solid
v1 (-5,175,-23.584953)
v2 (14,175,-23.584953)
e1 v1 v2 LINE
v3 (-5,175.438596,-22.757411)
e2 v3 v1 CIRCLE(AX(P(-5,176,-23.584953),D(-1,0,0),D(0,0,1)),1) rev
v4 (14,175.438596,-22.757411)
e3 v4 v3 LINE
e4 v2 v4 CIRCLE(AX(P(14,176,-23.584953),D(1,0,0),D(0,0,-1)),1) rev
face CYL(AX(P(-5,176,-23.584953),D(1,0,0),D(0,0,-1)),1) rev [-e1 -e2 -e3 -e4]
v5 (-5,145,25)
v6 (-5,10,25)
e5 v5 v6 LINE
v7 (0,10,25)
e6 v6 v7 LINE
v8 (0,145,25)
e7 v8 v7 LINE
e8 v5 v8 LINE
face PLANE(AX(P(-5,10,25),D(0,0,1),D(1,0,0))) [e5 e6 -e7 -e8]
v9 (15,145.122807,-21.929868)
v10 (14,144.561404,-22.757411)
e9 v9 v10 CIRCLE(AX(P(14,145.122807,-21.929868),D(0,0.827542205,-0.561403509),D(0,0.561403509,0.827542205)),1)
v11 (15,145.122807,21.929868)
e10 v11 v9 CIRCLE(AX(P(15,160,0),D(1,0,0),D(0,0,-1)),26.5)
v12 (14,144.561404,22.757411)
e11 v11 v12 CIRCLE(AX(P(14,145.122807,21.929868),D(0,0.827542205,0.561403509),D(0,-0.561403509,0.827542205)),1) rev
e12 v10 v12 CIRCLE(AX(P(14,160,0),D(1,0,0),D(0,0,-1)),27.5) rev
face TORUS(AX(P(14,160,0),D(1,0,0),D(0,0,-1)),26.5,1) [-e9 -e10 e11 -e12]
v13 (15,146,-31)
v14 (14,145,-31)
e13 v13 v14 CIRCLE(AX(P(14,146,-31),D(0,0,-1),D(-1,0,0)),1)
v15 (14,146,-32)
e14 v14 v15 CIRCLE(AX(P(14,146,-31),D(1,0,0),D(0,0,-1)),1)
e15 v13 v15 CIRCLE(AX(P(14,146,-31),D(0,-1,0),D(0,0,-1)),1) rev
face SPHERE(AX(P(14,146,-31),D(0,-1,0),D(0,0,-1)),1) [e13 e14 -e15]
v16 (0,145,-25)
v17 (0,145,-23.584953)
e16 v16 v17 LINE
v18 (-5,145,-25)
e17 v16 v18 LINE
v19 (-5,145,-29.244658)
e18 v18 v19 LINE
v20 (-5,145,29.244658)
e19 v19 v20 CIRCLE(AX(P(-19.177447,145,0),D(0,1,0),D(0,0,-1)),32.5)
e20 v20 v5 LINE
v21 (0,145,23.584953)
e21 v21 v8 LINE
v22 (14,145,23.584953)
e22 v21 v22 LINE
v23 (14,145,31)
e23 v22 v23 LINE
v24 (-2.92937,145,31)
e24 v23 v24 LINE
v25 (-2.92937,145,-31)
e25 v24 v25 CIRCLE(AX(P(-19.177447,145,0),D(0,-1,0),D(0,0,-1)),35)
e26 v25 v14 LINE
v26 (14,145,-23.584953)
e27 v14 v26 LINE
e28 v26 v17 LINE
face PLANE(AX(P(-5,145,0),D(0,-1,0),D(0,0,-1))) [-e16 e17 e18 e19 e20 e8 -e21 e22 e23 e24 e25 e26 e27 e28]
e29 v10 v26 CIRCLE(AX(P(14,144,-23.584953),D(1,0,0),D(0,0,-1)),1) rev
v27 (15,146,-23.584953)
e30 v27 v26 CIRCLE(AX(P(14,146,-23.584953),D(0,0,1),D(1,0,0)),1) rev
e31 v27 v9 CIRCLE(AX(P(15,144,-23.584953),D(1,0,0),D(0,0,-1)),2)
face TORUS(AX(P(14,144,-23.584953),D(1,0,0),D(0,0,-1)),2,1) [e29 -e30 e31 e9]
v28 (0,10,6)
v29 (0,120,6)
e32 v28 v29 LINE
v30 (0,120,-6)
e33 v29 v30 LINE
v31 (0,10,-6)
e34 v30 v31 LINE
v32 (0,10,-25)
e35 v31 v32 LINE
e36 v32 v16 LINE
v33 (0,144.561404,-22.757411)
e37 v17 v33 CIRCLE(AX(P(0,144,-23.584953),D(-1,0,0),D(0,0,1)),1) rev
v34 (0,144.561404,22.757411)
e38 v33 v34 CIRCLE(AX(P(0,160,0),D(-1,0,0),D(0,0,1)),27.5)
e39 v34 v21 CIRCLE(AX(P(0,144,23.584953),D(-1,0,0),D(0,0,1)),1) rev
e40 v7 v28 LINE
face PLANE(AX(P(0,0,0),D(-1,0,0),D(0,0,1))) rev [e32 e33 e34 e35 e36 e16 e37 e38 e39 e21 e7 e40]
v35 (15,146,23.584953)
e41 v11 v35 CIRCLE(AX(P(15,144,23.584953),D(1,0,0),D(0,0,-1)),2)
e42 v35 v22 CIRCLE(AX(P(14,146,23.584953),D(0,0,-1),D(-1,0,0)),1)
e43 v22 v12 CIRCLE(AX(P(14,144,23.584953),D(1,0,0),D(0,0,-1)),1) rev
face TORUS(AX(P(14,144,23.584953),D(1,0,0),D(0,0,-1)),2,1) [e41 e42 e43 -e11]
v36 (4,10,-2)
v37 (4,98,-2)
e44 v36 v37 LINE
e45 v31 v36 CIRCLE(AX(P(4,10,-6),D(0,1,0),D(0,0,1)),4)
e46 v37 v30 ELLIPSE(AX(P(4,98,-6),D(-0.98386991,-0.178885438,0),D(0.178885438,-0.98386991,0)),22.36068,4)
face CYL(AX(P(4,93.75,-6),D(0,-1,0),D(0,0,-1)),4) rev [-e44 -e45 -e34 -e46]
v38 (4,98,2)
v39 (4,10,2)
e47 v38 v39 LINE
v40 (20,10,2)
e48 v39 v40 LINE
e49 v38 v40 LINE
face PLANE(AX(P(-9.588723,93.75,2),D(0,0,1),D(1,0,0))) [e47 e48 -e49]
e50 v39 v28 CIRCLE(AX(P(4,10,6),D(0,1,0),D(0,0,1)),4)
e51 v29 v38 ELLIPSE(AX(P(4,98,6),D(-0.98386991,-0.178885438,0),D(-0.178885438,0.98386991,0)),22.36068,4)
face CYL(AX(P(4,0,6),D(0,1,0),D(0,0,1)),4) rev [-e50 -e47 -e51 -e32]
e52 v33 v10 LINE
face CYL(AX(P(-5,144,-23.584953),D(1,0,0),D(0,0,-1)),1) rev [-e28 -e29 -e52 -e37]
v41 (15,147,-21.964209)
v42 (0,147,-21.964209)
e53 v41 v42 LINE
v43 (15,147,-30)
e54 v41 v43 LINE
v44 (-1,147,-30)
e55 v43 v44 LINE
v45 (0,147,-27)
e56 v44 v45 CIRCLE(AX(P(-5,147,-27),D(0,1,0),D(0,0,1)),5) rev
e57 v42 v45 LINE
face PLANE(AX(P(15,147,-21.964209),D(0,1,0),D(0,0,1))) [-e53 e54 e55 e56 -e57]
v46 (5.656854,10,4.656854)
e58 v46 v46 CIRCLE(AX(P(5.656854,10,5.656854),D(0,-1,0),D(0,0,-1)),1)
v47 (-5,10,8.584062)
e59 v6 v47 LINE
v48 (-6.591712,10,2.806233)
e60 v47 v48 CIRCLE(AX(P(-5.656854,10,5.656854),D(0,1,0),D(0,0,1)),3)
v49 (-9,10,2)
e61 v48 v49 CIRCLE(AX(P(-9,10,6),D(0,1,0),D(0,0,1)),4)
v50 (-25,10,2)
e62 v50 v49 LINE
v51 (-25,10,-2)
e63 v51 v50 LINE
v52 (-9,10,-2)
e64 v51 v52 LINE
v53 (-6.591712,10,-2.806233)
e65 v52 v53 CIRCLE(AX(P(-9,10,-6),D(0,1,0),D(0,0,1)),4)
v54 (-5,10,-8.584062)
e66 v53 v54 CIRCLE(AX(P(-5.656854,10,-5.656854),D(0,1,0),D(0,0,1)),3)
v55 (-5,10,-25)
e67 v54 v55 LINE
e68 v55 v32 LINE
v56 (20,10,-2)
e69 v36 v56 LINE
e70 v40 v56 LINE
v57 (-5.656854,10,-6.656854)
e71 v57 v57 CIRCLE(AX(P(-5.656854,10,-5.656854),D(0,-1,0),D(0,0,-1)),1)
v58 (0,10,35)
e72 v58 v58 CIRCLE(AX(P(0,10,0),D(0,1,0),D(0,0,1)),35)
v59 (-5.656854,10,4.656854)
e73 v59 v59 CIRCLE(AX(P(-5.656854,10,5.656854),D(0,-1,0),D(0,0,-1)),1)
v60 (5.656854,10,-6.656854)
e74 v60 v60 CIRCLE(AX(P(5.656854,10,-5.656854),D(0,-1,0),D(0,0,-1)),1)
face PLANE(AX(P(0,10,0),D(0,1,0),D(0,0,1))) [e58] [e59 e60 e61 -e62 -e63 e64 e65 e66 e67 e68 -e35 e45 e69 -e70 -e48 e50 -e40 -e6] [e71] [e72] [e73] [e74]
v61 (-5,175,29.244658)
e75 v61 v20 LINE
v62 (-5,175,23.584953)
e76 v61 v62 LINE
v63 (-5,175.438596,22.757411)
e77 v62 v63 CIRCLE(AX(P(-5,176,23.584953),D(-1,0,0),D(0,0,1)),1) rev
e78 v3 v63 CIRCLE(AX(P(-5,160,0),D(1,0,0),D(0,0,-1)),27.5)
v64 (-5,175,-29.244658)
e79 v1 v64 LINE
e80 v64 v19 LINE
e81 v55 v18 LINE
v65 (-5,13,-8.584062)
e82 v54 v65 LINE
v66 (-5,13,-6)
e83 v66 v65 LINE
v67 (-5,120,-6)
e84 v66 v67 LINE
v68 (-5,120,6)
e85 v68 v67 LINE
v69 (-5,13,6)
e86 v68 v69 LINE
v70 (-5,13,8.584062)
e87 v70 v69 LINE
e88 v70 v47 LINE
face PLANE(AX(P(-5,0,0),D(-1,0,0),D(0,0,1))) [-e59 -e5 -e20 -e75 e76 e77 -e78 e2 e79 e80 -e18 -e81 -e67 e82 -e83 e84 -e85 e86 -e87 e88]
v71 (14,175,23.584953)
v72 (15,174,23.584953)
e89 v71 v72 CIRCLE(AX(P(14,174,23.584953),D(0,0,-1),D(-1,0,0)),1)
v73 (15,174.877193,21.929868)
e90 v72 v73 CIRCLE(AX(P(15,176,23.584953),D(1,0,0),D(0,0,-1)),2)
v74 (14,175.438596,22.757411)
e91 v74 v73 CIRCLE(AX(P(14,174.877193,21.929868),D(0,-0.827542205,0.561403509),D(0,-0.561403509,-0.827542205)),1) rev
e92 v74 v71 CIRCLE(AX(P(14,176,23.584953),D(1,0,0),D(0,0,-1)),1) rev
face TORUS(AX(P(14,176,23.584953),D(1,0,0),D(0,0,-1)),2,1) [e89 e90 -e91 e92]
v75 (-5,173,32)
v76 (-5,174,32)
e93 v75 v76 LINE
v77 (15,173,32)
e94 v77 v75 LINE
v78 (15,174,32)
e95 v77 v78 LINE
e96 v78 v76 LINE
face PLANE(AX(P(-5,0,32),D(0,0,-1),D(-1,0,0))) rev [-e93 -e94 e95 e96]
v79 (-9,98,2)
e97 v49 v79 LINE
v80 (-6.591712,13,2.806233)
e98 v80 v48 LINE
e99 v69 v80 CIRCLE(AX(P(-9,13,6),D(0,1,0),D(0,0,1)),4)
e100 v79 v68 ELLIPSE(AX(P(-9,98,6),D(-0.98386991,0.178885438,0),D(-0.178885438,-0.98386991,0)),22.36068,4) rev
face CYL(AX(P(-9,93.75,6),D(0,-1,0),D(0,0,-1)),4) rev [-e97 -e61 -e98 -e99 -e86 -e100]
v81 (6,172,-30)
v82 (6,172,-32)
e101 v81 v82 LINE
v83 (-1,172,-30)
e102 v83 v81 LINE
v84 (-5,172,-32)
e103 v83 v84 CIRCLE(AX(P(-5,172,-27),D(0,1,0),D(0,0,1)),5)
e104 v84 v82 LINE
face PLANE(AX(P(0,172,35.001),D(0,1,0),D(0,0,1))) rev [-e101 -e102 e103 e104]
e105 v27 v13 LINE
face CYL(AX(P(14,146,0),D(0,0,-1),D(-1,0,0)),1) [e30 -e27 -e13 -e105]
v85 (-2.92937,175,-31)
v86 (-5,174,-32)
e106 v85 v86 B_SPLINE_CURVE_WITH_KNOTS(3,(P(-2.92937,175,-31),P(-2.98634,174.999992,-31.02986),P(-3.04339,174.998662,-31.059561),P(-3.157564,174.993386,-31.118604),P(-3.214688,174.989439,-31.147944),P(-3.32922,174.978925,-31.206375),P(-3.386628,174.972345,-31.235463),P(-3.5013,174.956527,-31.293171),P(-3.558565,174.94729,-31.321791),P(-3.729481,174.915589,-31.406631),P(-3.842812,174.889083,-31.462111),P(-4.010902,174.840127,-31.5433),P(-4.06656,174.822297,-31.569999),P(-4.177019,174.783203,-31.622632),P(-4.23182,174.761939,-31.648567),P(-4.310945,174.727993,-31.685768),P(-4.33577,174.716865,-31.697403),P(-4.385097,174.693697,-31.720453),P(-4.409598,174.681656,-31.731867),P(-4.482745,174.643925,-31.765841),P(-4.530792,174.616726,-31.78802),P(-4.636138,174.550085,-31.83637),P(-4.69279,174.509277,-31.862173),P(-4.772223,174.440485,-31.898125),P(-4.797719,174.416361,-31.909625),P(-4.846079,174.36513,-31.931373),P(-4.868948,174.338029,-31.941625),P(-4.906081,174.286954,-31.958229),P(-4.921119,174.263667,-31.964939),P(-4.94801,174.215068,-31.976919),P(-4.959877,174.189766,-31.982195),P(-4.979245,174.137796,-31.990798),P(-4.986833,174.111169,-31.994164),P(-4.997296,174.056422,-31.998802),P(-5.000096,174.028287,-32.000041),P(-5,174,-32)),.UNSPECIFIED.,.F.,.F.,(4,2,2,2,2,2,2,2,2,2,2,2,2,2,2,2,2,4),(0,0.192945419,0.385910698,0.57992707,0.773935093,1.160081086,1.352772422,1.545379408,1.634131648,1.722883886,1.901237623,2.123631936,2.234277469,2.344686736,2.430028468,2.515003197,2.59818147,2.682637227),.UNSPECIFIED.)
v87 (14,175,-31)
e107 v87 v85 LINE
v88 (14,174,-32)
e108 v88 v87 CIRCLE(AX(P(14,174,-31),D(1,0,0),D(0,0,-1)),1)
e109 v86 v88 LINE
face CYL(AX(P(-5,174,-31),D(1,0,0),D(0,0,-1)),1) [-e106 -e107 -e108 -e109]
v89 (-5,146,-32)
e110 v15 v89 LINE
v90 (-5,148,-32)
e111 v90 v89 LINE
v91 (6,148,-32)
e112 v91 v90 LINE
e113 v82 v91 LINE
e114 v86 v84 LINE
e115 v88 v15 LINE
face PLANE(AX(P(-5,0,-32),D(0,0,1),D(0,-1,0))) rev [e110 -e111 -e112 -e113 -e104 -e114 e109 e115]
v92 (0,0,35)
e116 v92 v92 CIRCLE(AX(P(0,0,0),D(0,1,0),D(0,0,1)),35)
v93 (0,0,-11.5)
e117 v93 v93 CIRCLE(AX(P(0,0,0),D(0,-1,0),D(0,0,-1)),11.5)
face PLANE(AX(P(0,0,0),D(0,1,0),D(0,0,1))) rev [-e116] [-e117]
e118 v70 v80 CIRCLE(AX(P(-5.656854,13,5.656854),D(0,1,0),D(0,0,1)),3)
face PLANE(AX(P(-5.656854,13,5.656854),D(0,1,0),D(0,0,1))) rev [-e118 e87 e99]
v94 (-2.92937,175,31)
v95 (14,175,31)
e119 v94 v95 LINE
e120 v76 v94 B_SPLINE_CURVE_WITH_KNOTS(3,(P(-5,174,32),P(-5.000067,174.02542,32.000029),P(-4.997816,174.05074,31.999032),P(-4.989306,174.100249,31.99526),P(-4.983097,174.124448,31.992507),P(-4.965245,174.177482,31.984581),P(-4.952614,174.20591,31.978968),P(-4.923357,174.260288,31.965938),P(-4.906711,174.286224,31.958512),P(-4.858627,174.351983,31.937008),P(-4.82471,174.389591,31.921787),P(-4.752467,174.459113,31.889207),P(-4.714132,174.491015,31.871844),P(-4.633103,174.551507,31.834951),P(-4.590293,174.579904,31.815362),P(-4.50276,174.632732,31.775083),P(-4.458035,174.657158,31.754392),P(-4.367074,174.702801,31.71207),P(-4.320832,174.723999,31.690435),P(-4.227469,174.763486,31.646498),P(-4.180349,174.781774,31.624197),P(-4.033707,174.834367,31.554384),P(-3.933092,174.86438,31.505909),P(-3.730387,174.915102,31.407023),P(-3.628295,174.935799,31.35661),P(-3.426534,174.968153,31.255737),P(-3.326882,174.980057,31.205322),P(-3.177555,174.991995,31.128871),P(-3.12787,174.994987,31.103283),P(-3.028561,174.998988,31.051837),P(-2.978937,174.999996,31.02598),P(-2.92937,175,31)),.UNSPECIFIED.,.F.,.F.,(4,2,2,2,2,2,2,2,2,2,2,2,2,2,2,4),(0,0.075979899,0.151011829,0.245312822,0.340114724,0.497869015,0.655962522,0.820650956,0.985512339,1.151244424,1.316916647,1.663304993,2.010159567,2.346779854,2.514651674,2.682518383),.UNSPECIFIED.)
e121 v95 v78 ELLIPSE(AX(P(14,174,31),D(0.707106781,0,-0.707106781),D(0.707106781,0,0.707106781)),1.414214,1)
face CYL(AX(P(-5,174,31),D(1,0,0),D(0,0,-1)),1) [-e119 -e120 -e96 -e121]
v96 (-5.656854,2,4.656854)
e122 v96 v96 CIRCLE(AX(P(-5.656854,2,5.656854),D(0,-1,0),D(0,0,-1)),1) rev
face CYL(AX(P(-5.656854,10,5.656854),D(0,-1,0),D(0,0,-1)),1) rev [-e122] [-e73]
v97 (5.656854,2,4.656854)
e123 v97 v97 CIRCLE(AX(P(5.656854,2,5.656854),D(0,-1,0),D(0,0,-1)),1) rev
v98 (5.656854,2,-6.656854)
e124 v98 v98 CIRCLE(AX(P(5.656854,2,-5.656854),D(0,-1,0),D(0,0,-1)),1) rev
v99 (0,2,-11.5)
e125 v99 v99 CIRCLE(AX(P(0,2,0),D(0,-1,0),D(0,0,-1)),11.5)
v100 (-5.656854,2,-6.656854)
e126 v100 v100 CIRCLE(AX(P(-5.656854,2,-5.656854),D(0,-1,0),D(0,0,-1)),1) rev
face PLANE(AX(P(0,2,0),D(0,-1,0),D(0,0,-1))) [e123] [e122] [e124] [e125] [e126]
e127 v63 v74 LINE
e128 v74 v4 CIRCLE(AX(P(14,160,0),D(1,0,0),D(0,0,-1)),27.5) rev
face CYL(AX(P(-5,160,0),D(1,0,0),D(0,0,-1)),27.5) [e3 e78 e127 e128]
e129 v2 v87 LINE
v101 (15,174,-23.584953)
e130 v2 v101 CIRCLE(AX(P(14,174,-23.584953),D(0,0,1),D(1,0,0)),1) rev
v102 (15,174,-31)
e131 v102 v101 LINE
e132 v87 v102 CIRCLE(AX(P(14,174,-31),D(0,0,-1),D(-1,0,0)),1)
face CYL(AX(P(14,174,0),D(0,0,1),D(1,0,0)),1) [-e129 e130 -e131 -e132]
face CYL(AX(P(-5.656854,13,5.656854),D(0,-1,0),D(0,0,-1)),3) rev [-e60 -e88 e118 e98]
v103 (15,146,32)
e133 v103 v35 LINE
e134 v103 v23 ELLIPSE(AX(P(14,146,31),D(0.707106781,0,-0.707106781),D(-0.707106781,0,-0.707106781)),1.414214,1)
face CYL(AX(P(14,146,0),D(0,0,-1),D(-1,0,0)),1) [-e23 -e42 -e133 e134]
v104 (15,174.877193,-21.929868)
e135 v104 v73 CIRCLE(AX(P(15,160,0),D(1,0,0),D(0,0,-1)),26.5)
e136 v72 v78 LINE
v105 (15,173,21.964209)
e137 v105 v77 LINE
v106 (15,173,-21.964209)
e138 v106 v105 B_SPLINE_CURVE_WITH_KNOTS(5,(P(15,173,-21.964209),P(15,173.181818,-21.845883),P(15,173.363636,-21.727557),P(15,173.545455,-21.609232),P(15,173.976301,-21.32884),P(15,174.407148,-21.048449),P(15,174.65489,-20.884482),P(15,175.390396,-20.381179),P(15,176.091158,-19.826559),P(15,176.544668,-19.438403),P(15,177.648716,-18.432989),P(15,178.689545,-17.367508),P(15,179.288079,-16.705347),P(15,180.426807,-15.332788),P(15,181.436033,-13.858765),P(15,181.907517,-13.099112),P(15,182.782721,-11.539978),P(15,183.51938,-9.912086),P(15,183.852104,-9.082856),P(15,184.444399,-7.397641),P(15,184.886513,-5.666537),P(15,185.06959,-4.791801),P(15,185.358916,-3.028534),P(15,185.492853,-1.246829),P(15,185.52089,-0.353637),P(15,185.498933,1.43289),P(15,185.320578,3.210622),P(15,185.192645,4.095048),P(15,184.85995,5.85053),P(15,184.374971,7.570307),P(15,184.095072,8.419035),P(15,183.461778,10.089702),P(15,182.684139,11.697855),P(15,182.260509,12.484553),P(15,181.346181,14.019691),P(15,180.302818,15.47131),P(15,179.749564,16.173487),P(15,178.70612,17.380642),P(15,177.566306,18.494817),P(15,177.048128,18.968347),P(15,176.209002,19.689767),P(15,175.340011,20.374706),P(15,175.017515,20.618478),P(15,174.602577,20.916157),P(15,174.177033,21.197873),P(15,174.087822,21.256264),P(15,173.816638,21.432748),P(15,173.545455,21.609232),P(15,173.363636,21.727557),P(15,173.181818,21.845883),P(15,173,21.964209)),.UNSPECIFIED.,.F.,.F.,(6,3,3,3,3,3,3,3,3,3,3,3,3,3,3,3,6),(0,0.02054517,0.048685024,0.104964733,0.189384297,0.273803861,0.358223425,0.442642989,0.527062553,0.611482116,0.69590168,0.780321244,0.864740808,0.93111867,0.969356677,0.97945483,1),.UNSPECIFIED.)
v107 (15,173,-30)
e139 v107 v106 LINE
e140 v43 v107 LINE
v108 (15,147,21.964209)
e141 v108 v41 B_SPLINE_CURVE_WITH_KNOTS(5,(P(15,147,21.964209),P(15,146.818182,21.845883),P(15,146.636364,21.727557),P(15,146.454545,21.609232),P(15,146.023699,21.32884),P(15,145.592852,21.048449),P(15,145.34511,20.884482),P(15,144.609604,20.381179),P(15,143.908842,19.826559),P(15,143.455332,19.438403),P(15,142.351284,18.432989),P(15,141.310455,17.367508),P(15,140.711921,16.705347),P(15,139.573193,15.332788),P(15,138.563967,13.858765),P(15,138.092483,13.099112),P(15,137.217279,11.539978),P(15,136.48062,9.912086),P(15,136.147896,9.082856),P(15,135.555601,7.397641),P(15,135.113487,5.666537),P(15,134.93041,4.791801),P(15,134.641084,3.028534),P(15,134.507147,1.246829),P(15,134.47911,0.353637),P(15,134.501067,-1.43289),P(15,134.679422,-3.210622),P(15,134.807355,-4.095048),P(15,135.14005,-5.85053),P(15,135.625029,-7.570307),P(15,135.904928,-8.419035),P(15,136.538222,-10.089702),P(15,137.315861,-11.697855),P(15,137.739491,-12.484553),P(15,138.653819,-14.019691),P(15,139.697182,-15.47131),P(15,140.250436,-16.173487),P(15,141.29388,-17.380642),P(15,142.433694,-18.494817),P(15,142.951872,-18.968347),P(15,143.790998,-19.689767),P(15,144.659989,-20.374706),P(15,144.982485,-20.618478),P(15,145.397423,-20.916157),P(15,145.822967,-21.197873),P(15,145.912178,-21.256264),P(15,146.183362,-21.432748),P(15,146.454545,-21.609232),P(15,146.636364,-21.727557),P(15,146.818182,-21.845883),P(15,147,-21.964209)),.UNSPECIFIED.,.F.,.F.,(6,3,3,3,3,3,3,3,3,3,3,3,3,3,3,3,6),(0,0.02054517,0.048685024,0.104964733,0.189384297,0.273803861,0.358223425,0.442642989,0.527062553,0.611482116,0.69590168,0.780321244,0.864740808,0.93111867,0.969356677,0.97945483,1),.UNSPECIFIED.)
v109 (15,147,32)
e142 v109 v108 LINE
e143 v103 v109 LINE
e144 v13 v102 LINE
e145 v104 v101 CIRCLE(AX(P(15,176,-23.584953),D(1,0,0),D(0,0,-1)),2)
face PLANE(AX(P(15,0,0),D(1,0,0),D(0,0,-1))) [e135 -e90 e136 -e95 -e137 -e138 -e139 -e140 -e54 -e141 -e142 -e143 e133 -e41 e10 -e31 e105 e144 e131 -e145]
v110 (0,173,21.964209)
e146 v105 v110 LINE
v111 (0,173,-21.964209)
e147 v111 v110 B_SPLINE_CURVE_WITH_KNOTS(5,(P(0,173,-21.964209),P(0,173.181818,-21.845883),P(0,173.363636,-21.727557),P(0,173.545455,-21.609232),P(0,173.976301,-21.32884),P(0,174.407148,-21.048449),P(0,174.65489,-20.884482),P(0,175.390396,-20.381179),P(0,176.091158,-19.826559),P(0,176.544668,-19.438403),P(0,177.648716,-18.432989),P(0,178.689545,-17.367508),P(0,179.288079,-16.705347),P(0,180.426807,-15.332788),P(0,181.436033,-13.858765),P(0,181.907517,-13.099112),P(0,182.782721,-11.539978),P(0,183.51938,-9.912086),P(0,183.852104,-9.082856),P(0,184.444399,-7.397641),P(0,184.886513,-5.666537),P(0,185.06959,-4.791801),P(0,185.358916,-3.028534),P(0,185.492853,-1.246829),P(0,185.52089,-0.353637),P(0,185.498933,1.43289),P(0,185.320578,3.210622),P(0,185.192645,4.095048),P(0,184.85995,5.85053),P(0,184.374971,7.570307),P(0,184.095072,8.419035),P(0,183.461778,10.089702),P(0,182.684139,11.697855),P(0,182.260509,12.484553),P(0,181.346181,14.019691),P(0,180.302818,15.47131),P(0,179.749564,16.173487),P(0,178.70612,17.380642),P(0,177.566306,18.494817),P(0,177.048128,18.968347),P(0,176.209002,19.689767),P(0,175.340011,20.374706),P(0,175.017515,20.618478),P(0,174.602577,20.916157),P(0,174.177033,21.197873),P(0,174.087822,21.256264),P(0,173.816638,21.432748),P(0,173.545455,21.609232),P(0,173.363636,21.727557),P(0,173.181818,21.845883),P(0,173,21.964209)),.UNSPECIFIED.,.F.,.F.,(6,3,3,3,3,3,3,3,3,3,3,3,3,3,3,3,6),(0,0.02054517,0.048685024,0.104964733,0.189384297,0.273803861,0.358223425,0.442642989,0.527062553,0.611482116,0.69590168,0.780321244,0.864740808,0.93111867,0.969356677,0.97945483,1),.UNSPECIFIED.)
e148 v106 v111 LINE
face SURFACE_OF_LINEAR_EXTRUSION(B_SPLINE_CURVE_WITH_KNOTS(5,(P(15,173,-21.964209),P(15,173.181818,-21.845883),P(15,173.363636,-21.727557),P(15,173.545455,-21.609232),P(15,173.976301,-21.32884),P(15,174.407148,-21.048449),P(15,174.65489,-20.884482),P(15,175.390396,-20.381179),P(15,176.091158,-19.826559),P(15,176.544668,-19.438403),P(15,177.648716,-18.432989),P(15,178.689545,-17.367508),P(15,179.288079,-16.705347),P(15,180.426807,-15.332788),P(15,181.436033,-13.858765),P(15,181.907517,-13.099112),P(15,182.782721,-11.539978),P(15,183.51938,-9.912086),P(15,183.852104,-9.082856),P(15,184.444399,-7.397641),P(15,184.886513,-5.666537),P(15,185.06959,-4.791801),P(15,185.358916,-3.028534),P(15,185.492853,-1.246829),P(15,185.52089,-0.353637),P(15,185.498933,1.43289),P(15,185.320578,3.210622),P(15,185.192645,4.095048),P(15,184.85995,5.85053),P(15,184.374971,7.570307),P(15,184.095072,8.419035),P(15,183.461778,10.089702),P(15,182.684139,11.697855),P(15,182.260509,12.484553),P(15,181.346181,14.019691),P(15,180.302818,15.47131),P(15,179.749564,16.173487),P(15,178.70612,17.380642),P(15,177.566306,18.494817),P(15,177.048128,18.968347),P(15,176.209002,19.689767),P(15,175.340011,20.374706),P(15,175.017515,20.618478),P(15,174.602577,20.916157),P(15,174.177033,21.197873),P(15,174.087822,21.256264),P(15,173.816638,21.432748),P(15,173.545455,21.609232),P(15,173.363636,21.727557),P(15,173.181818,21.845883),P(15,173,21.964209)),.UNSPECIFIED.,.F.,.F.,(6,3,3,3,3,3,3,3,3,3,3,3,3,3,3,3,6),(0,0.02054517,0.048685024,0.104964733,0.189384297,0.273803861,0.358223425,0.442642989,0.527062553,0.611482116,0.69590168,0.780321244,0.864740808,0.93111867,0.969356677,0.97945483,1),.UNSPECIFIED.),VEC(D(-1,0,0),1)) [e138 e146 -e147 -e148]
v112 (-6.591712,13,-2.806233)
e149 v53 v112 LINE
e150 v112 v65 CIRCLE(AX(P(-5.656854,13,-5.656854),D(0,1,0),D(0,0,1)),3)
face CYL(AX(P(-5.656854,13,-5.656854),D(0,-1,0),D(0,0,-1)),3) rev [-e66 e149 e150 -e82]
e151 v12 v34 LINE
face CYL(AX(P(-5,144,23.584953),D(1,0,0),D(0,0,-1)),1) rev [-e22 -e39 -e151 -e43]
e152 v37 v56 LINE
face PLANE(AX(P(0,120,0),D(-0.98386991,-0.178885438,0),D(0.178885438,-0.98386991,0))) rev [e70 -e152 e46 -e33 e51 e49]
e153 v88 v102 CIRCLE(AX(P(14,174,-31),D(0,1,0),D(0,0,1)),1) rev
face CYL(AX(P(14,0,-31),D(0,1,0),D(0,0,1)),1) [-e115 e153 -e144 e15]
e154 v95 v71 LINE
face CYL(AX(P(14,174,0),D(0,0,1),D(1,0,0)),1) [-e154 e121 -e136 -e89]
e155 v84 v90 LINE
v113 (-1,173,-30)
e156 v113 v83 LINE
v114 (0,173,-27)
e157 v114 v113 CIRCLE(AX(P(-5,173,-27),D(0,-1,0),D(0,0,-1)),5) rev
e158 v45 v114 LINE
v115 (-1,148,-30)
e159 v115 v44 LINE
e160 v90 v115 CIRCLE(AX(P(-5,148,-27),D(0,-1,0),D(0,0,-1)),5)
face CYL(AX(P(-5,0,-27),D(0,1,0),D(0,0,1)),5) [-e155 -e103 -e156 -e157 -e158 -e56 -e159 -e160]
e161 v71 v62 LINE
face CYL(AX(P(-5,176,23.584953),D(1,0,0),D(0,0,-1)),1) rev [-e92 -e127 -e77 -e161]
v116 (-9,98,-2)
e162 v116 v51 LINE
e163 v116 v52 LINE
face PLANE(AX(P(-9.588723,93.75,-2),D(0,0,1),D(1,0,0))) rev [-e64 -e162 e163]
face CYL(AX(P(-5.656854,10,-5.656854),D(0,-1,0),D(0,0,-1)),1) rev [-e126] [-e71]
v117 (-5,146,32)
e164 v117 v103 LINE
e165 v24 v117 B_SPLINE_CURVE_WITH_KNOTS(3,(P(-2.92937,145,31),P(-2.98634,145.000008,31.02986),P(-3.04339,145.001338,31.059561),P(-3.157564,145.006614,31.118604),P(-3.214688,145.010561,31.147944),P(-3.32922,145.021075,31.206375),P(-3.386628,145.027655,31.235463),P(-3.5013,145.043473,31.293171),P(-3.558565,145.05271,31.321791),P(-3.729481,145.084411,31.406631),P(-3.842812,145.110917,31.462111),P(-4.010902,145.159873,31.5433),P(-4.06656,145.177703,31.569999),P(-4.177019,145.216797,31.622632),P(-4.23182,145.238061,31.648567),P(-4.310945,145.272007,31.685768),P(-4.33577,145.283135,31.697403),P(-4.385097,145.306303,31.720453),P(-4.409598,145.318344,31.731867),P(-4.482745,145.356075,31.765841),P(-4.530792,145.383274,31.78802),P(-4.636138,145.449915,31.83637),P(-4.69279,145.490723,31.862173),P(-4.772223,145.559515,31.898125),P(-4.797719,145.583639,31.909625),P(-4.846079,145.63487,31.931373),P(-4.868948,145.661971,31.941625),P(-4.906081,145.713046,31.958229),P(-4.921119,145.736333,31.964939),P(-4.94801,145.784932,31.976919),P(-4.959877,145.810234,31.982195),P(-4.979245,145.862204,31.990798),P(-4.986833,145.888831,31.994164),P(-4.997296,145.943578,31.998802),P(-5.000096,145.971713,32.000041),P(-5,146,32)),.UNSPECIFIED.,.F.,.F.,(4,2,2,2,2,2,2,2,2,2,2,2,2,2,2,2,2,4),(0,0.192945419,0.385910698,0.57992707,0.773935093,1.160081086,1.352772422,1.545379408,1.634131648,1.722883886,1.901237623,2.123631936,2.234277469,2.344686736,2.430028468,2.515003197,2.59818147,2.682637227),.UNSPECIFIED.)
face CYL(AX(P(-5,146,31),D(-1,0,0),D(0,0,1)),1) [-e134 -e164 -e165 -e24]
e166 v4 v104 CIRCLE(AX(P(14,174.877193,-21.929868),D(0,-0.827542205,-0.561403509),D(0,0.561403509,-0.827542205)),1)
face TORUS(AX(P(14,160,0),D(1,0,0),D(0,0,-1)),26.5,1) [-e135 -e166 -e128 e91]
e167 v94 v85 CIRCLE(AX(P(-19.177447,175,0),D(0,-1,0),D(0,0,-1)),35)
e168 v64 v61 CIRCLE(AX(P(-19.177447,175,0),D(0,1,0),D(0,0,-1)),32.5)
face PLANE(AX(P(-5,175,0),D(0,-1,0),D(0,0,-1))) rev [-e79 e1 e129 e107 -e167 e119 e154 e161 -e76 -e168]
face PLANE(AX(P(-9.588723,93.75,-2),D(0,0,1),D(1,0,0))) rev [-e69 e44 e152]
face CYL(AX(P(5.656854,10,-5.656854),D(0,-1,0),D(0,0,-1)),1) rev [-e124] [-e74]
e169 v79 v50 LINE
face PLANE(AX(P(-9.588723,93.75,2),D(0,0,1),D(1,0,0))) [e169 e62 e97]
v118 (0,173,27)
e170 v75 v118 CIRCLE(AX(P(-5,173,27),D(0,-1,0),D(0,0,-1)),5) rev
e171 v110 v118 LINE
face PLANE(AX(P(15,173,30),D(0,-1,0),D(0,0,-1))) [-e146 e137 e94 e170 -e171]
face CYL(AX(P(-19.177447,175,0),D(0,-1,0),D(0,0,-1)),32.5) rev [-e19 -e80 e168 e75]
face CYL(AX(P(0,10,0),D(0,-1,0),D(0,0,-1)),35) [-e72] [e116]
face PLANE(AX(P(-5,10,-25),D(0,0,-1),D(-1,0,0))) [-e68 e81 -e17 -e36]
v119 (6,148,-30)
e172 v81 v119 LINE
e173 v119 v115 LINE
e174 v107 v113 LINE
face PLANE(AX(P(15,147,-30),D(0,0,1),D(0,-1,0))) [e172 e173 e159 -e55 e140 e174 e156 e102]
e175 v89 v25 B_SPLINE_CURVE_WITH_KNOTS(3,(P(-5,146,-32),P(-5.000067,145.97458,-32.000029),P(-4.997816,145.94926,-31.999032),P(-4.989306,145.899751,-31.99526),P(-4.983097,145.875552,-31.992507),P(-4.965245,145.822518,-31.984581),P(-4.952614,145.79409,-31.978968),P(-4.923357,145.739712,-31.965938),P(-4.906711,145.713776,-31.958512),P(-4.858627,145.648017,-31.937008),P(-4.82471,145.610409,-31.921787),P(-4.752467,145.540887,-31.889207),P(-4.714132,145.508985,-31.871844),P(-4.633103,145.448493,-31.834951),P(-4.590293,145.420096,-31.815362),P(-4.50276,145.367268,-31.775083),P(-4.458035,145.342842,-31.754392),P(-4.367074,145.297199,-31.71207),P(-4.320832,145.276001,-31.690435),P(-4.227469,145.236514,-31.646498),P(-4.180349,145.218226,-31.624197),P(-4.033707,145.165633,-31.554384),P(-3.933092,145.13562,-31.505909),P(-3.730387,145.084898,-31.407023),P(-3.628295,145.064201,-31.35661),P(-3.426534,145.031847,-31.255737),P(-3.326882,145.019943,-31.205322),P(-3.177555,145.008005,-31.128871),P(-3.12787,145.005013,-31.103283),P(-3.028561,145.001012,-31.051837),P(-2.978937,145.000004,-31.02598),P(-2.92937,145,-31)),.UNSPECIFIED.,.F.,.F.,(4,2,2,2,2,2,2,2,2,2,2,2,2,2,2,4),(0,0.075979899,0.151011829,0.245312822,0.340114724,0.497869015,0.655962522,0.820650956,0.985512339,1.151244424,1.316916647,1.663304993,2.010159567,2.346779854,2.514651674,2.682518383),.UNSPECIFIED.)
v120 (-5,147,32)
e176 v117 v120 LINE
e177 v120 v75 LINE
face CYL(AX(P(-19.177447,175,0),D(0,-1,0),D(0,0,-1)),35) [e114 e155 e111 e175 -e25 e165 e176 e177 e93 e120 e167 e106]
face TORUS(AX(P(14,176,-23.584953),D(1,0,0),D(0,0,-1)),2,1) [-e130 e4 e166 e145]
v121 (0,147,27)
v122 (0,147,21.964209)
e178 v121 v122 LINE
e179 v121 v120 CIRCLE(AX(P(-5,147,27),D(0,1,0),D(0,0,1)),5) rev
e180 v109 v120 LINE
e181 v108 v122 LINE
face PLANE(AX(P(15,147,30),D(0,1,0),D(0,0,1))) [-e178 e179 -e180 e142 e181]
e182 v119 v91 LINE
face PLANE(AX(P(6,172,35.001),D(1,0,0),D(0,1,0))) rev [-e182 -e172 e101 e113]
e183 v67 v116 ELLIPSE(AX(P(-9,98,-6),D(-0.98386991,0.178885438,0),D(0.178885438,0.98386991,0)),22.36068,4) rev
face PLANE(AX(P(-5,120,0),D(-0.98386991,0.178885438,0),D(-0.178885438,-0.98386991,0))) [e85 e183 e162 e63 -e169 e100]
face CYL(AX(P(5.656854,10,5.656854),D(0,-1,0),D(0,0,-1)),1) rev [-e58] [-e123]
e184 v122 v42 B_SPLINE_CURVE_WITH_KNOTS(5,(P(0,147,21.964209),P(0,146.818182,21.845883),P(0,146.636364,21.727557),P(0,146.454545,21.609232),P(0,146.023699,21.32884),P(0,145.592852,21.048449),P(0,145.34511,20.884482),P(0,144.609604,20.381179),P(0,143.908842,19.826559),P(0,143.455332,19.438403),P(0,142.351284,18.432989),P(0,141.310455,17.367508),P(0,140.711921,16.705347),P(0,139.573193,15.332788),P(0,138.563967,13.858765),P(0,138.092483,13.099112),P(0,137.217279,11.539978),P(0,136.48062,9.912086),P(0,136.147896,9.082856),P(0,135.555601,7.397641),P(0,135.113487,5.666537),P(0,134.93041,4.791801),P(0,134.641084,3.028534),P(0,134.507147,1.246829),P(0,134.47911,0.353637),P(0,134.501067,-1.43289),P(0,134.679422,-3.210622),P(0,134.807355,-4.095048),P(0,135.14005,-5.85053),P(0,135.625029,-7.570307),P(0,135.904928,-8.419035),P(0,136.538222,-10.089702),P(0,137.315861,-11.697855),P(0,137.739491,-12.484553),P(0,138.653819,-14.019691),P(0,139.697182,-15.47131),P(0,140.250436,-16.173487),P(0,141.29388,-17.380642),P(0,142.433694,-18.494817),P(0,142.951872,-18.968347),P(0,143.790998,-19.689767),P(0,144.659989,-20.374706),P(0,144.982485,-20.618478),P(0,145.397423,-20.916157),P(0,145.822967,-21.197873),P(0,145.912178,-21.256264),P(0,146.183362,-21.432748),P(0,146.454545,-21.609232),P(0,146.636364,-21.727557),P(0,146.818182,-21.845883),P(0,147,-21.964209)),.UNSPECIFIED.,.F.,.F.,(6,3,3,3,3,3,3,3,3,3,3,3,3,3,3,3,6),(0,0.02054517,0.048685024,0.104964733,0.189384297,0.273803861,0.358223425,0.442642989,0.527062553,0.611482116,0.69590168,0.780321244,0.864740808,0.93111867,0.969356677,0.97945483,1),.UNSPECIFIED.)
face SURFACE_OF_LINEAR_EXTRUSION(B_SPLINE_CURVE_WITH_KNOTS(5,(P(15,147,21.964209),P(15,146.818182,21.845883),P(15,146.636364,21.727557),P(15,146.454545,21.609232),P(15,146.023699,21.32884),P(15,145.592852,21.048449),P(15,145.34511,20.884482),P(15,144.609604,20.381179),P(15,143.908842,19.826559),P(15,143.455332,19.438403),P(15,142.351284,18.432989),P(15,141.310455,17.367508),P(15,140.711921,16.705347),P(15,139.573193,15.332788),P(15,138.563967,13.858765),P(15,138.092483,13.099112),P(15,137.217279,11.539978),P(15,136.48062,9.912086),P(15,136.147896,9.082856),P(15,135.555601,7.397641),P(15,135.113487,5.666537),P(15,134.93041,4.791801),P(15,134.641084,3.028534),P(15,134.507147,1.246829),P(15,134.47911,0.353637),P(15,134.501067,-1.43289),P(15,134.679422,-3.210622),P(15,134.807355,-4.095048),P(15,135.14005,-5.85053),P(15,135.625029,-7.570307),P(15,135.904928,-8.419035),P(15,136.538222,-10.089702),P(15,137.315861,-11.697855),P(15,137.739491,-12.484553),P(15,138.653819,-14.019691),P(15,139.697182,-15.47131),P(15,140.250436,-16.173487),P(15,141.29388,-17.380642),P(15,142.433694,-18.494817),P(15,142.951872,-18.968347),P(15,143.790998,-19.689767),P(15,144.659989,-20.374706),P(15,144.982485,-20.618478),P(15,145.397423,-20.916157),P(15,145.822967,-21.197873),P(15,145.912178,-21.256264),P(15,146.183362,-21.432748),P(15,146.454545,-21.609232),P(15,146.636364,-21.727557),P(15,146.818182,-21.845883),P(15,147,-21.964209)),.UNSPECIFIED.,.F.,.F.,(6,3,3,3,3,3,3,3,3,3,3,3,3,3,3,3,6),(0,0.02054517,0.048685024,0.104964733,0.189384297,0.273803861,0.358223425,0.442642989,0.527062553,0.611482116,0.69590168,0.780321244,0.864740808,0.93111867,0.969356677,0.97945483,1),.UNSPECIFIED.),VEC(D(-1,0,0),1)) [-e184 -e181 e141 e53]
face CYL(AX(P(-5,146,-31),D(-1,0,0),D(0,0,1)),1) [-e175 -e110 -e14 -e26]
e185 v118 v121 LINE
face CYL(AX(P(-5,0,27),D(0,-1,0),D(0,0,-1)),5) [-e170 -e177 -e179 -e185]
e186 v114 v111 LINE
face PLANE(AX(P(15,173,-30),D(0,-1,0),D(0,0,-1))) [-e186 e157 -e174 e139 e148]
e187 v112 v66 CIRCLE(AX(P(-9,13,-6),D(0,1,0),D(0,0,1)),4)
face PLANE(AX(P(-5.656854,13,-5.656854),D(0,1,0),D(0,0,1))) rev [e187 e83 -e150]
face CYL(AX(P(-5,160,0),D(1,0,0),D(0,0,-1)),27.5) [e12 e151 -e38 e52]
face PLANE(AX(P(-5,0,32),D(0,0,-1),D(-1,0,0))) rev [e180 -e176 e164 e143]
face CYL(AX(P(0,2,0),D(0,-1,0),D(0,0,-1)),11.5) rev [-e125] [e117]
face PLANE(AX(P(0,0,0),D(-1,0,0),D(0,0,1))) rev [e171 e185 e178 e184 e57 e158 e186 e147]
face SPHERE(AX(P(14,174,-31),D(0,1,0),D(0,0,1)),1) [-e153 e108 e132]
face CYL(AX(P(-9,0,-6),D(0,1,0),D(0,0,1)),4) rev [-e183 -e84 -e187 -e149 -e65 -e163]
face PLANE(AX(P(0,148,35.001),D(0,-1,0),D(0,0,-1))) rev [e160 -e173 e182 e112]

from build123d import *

# Parameters (mm, degrees)
CROQUIS1_R                   = 35
SALIENTE_EXTRUIR1_DEPTH      = 10
CROQUIS4_W                   = 50
CROQUIS4_H                   = 150
SALIENTE_EXTRUIR3_DEPTH      = 5
SALIENTE_EXTRUIR4_DEPTH      = 15
SALIENTE_EXTRUIR4_DEPTH_BACK = 5
CORTAR_EXTRUIR2_DEPTH        = 15
SALIENTE_EXTRUIR5_DEPTH      = 30
CORTAR_EXTRUIR3_REACH        = 208.35
CROQUIS7_W                   = 6
CROQUIS7_H                   = 24
REDONDEO1_R                  = 5
REDONDEO2_R                  = 1
NERVIO1_REACH                = 200.284
CROQUIS8_WALL_W              = 510.370900346
CROQUIS8_WALL_H              = 4
CROQUIS11_R                  = 1
CORTAR_EXTRUIR7_DEPTH        = 10
CROQUIS13_R                  = 3
CORTAR_EXTRUIR8_DEPTH        = 3
CROQUIS14_R                  = 11.5
CORTAR_EXTRUIR9_DEPTH        = 2
REDONDEO3_R                  = 4


# Some blends are built 0.0001 mm under size
with BuildPart() as part:
    # Croquis1 → Saliente-Extruir1 (new body)
    with BuildSketch(Plane(origin=(0, 0, 0), x_dir=(1, 0, 0), z_dir=(0, 1, 0))):
        with Locations(Location((0, 0, 0), (0, 0, 270))):
            Circle(CROQUIS1_R)
    extrude(amount=SALIENTE_EXTRUIR1_DEPTH)

    # Croquis4 → Saliente-Extruir3 (add)
    with BuildSketch(Plane(origin=(0, 0, 0), x_dir=(0, 0, -1), z_dir=(1, 0, 0))):
        with Locations((0, 85)):
            Rectangle(CROQUIS4_W, CROQUIS4_H)
    extrude(amount=-SALIENTE_EXTRUIR3_DEPTH)

    # Croquis5 → Saliente-Extruir4 (add, two sides: drawn at the far end of the back side and taken through both)
    with BuildSketch(Plane(origin=(0, 0, 0), x_dir=(0, 0, -1), z_dir=(1, 0, 0)).offset(-SALIENTE_EXTRUIR4_DEPTH_BACK)):
        with BuildLine():
            Line((32, 175), (23.048861143, 175))
            ThreePointArc((23.048861143, 175), (26.363741023, 167.823244805), (27.5, 160))
            ThreePointArc((27.5, 160), (26.867731575, 154.1369803), (25, 148.543560763))
            Line((25, 148.543560763), (25, 145))
            Line((25, 145), (32, 145))
            Line((32, 145), (32, 175))
        make_face()
        with BuildLine():
            ThreePointArc((27.5, 160), (26.363741023, 167.823244805), (23.048861143, 175))
            Line((23.048861143, 175), (23, 175))
            Line((23, 175), (23, 160))
            Line((23, 160), (25, 160))
            Line((25, 160), (25, 148.543560763))
            ThreePointArc((25, 148.543560763), (26.867731575, 154.1369803), (27.5, 160))
        make_face()
        with BuildLine():
            Line((23, 145), (23.048861143, 145))
            ThreePointArc((23.048861143, 145), (24.08967559, 146.735855475), (25, 148.543560763))
            Line((25, 148.543560763), (25, 160))
            Line((25, 160), (23, 160))
            Line((23, 160), (23, 145))
        make_face()
        with BuildLine():
            Line((-23, 145), (-23.048861143, 145))
            ThreePointArc((-23.048861143, 145), (0, 132.5), (23.048861143, 145))
            Line((23.048861143, 145), (23, 145))
            Line((23, 145), (23, 160))
            Line((23, 160), (-23, 160))
            Line((-23, 160), (-23, 145))
        make_face()
        with BuildLine():
            ThreePointArc((23.048861143, 175), (0, 187.5), (-23.048861143, 175))
            Line((-23.048861143, 175), (-23, 175))
            Line((-23, 175), (-23, 160))
            Line((-23, 160), (23, 160))
            Line((23, 160), (23, 175))
            Line((23, 175), (23.048861143, 175))
        make_face()
        with BuildLine():
            ThreePointArc((-23.048861143, 175), (-27.425518383, 162.022607582), (-25, 148.543560763))
            Line((-25, 148.543560763), (-25, 160))
            Line((-25, 160), (-23, 160))
            Line((-23, 160), (-23, 175))
            Line((-23, 175), (-23.048861143, 175))
        make_face()
        with BuildLine():
            ThreePointArc((-25, 148.543560763), (-24.08967559, 146.735855475), (-23.048861143, 145))
            Line((-23.048861143, 145), (-23, 145))
            Line((-23, 145), (-23, 160))
            Line((-23, 160), (-25, 160))
            Line((-25, 160), (-25, 148.543560763))
        make_face()
        with BuildLine():
            Line((-32, 175), (-32, 145))
            Line((-32, 145), (-25, 145))
            Line((-25, 145), (-25, 148.543560763))
            ThreePointArc((-25, 148.543560763), (-27.425518383, 162.022607582), (-23.048861143, 175))
            Line((-23.048861143, 175), (-32, 175))
        make_face()
        with BuildLine():
            Line((-25, 148.543560763), (-25, 145))
            Line((-25, 145), (-23.048861143, 145))
            ThreePointArc((-23.048861143, 145), (-24.08967559, 146.735855475), (-25, 148.543560763))
        make_face()
        with BuildLine():
            ThreePointArc((25, 148.543560763), (24.08967559, 146.735855475), (23.048861143, 145))
            Line((23.048861143, 145), (25, 145))
            Line((25, 145), (25, 148.543560763))
        make_face()
    extrude(amount=SALIENTE_EXTRUIR4_DEPTH + SALIENTE_EXTRUIR4_DEPTH_BACK)

    # Croquis3D1 → Cortar-Extruir2 (cut)
    with BuildSketch(Plane(origin=(15, 173, 21.964208854), x_dir=(0, -0.44745996476077016, -0.8943039639497805), z_dir=(-1, 0, 0))):
        with BuildLine():
            Line((0, 0), (-7.186439875, 3.595694823))
            Line((-7.186439875, 3.595694823), (-8.975047803, 4.490614752))
            Line((-8.975047803, 4.490614752), (2.658911281, 27.742517815))
            Line((2.658911281, 27.742517815), (4.447519209, 26.847597886))
            Line((4.447519209, 26.847597886), (11.633959084, 23.251903063))
            add(Edge.make_bspline(
                [(11.633959084, 23.251903063), (11.821134587, 23.361557768), (12.008310091, 23.471212473), (12.195485595, 23.580867178), (12.639027512, 23.840711321), (13.082569429, 24.100555463), (13.340059825, 24.248743681), (14.119274903, 24.681301019), (14.928837491, 25.059825437), (15.478894065, 25.291716547), (16.87205695, 25.829188383), (18.290650957, 26.283246181), (19.150643623, 26.522226893), (20.887663596, 26.926430552), (22.657477082, 27.16941903), (23.547807499, 27.251155178), (25.333766272, 27.336202706), (27.119222103, 27.266583515), (28.009685995, 27.193092604), (29.78180916, 26.968718879), (31.527769934, 26.589502806), (32.39196977, 26.361819705), (34.09832844, 25.831574416), (35.751645293, 25.154113043), (36.56297625, 24.779518686), (38.150849198, 23.96048333), (39.660876152, 23.005516089), (40.394575881, 22.495359566), (41.81564334, 21.41232085), (43.1366378, 20.209071064), (43.770414953, 19.578984629), (44.981125449, 18.265071124), (46.071341018, 16.850041251), (46.585330652, 16.119171551), (47.549084787, 14.614571283), (48.380410984, 13.031946598), (48.760811382, 12.222973127), (49.373475059, 10.74966355), (49.859865002, 9.231774538), (50.051481317, 8.55647962), (50.32117475, 7.483239769), (50.544879698, 6.399614661), (50.618582194, 6.002126595), (50.699128791, 5.497846956), (50.760655408, 4.99122444), (50.772955822, 4.885315185), (50.809442312, 4.563825108), (50.845928803, 4.242335031), (50.870391592, 4.026788295), (50.894854381, 3.811241559), (50.91931717, 3.595694823)],
                knots=[0, 0, 0, 0, 0, 0, 0.02054517, 0.02054517, 0.02054517, 0.048685024, 0.048685024, 0.048685024, 0.104964733, 0.104964733, 0.104964733, 0.189384297, 0.189384297, 0.189384297, 0.273803861, 0.273803861, 0.273803861, 0.358223425, 0.358223425, 0.358223425, 0.442642989, 0.442642989, 0.442642989, 0.527062553, 0.527062553, 0.527062553, 0.611482116, 0.611482116, 0.611482116, 0.69590168, 0.69590168, 0.69590168, 0.780321244, 0.780321244, 0.780321244, 0.864740808, 0.864740808, 0.864740808, 0.93111867, 0.93111867, 0.93111867, 0.969356677, 0.969356677, 0.969356677, 0.97945483, 0.97945483, 0.97945483, 1, 1, 1, 1, 1, 1], degree=5))
            Line((50.91931717, 3.595694823), (58.105757046, 0))
            Line((58.105757046, 0), (46.471797962, -23.251903063))
            Line((46.471797962, -23.251903063), (39.285358087, -19.65620824))
            add(Edge.make_bspline(
                [(39.285358087, -19.65620824), (39.098182583, -19.765862945), (38.911007079, -19.87551765), (38.723831576, -19.985172356), (38.280289658, -20.245016498), (37.836747741, -20.50486064), (37.579257346, -20.653048858), (36.800042268, -21.085606196), (35.990479679, -21.464130614), (35.440423106, -21.696021724), (34.047260221, -22.23349356), (32.628666214, -22.687551358), (31.768673547, -22.92653207), (30.031653574, -23.330735729), (28.261840088, -23.573724207), (27.371509671, -23.655460355), (25.585550898, -23.740507883), (23.800095068, -23.670888692), (22.909631175, -23.597397781), (21.13750801, -23.373024056), (19.391547237, -22.993807983), (18.5273474, -22.766124882), (16.82098873, -22.235879593), (15.167671878, -21.55841822), (14.35634092, -21.183823863), (12.768467973, -20.364788507), (11.258441018, -19.409821266), (10.524741289, -18.899664743), (9.103673831, -17.816626027), (7.782679371, -16.613376241), (7.148902218, -15.983289806), (5.938191721, -14.669376301), (4.847976153, -13.254346428), (4.333986518, -12.523476728), (3.370232383, -11.01887646), (2.538906187, -9.436251775), (2.158505788, -8.627278304), (1.545842111, -7.153968727), (1.059452168, -5.636079715), (0.867835854, -4.960784797), (0.598142421, -3.887544946), (0.374437473, -2.803919838), (0.300734976, -2.406431772), (0.220188379, -1.902152133), (0.158661762, -1.395529617), (0.146361349, -1.289620362), (0.109874858, -0.968130285), (0.073388367, -0.646640209), (0.048925578, -0.431093472), (0.024462789, -0.215546736), (0, 0)],
                knots=[0, 0, 0, 0, 0, 0, 0.02054517, 0.02054517, 0.02054517, 0.048685024, 0.048685024, 0.048685024, 0.104964733, 0.104964733, 0.104964733, 0.189384297, 0.189384297, 0.189384297, 0.273803861, 0.273803861, 0.273803861, 0.358223425, 0.358223425, 0.358223425, 0.442642989, 0.442642989, 0.442642989, 0.527062553, 0.527062553, 0.527062553, 0.611482116, 0.611482116, 0.611482116, 0.69590168, 0.69590168, 0.69590168, 0.780321244, 0.780321244, 0.780321244, 0.864740808, 0.864740808, 0.864740808, 0.93111867, 0.93111867, 0.93111867, 0.969356677, 0.969356677, 0.969356677, 0.97945483, 0.97945483, 0.97945483, 1, 1, 1, 1, 1, 1], degree=5))
        make_face()
    extrude(amount=CORTAR_EXTRUIR2_DEPTH, mode=Mode.SUBTRACT)

    # Croquis6 → Saliente-Extruir5 (add)
    with BuildSketch(Plane.XZ.offset(-145)):
        with BuildLine():
            Line((-5, 32), (-5, 29.244657632))
            ThreePointArc((-5, 29.244657632), (-51.677446879, 0), (-5, -29.244657632))
            Line((-5, -29.244657632), (-5, -32))
            ThreePointArc((-5, -32), (-54.177446879, 0), (-5, 32))
        make_face()
    extrude(amount=-SALIENTE_EXTRUIR5_DEPTH)

    # Croquis7 → Cortar-Extruir3 (cut, up to next)
    with BuildSketch(Plane(origin=(0, 0, -32), x_dir=(-1, 0, 0), z_dir=(0, 0, -1)), mode=Mode.PRIVATE) as cortar_extruir3_sk1:
        with Locations((-3, 160)):
            Rectangle(CROQUIS7_W, CROQUIS7_H)
    cortar_extruir3_tool1 = extrude(cortar_extruir3_sk1.sketch, amount=-CORTAR_EXTRUIR3_REACH, mode=Mode.PRIVATE) & part.part
    add(cortar_extruir3_tool1.solids().sort_by_distance((3, 160, -32))[0], mode=Mode.SUBTRACT)

    # Redondeo1
    redondeo1_edges = [part.edges().sort_by_distance(p)[0] for p in [
        (0, 160, -32),
        (0, 160, 32),
    ]]
    fillet(redondeo1_edges, radius=REDONDEO1_R - 0.0001)  # a hair under: the kernel refuses the full size

    # Redondeo2
    redondeo2_edges = [part.edges().sort_by_distance(p)[0] for p in [
        (7.5, 145, -23.048861143),
        (7.5, 145, 23.048861143),
        (5, 175, 23.048861143),
        (5, 175, -23.048861143),
        (5, 175, -32),
        (5, 145, -32),
        (15, 175, -27.524430572),
        (15, 145, -27.524430572),
        (15, 132.5, 0),
        (5, 145, 32),
        (15, 145, 27.524430572),
        (15, 175, 27.524430572),
        (15, 187.5, 0),
        (5, 175, 32),
        (15, 160, -32),
    ]]
    fillet(redondeo2_edges, radius=REDONDEO2_R)

    # Croquis8 wall → Nervio1 (add, up to next)
    with BuildSketch(Plane(origin=(10, 65, 0), x_dir=(0.1788854382, -0.9838699101, 0), z_dir=(0.9838699101, 0.1788854382, 0)), mode=Mode.PRIVATE) as nervio1_sk1:
        Rectangle(CROQUIS8_WALL_W, CROQUIS8_WALL_H)
    nervio1_tool1 = extrude(nervio1_sk1.sketch, amount=-NERVIO1_REACH, mode=Mode.PRIVATE) - part.part
    nervio1 = nervio1_tool1.solids().sort_by_distance((10, 65, 0))[0]
    add(nervio1)

    # Croquis11 → Cortar-Extruir7 (cut)
    with BuildSketch(Plane.XZ):
        with Locations(Location((5.656854249, 5.656854249, 0), (0, 0, 270))):
            Circle(CROQUIS11_R)
        with Locations(Location((5.656854249, -5.656854249, 0), (0, 0, 270))):
            Circle(CROQUIS11_R)
        with Locations(Location((-5.656854249, -5.656854249, 0), (0, 0, 270))):
            Circle(CROQUIS11_R)
        with Locations(Location((-5.656854249, 5.656854249, 0), (0, 0, 270))):
            Circle(CROQUIS11_R)
    extrude(amount=-CORTAR_EXTRUIR7_DEPTH, mode=Mode.SUBTRACT)

    # Croquis13 → Cortar-Extruir8 (cut)
    with BuildSketch(Plane(origin=(0, 10, 0), x_dir=(1, 0, 0), z_dir=(0, 1, 0))):
        with Locations((-5.656854249, 5.656854249)):
            Circle(CROQUIS13_R)
        with Locations((-5.656854249, -5.656854249)):
            Circle(CROQUIS13_R)
    extrude(amount=CORTAR_EXTRUIR8_DEPTH, mode=Mode.SUBTRACT)

    # Croquis14 → Cortar-Extruir9 (cut)
    with BuildSketch(Plane.XZ):
        with Locations(Location((0, 0, 0), (0, 0, 270))):
            Circle(CROQUIS14_R)
    extrude(amount=-CORTAR_EXTRUIR9_DEPTH, mode=Mode.SUBTRACT)

    # Simetría1: Nervio1 across plane
    add(nervio1.mirror(Plane.ZY.offset(2.5)))

    # Redondeo3
    # the kernel refuses this fillet: 4 mm, written as the material it adds along each edge
    with BuildSketch(Plane(origin=(-5, 130, -2), x_dir=(0, 0, -1), z_dir=(0, -1, 0))) as redondeo3_piece_1_section:
        with BuildLine():
            CenterArc((REDONDEO3_R, -REDONDEO3_R), REDONDEO3_R, 90, 90)
            Line((0, -REDONDEO3_R), (0, 0))
            Line((0, 0), (REDONDEO3_R, 0))
        make_face()
    redondeo3_piece_1 = extrude(amount=130, mode=Mode.PRIVATE)
    redondeo3_piece_1 = split(redondeo3_piece_1, bisect_by=Plane(origin=(-5.057051212, 13, -5.123027705), z_dir=(0, 1, 0)), keep=Keep.TOP, mode=Mode.PRIVATE)
    redondeo3_piece_1 = split(redondeo3_piece_1, bisect_by=Plane(origin=(-14.445438426, 68.050088656, -5.123027705), z_dir=(0.9838699100999074, -0.1788854381999832, 0)), keep=Keep.TOP, mode=Mode.PRIVATE)
    add(redondeo3_piece_1)
    with BuildSketch(Plane(origin=(-5, 130, -2), x_dir=(0, 0, -1), z_dir=(0, -1, 0))) as redondeo3_piece_2_section:
        with BuildLine():
            CenterArc((REDONDEO3_R, -REDONDEO3_R), REDONDEO3_R, 90, 90)
            Line((0, -REDONDEO3_R), (0, 0))
            Line((0, 0), (REDONDEO3_R, 0))
        make_face()
    redondeo3_piece_2 = extrude(amount=130, mode=Mode.PRIVATE)
    redondeo3_piece_2 = redondeo3_piece_2 - Plane(origin=(-5.656854249, 11.5, -5.656854249), x_dir=(1, 0, 0), z_dir=(0, -1, 0)) * Cylinder(3, 277, mode=Mode.PRIVATE)
    redondeo3_piece_2 = split(redondeo3_piece_2, bisect_by=Plane(origin=(-24.137648659, 14.742932375, -2.308845146), z_dir=(0.9838699100999074, -0.1788854381999832, 0)), keep=Keep.TOP, mode=Mode.PRIVATE)
    redondeo3_piece_2 = split(redondeo3_piece_2, bisect_by=Plane(origin=(-6.301520596, 2, -2.308845146), z_dir=(0, 1, 0)), keep=Keep.TOP, mode=Mode.PRIVATE)
    add(redondeo3_piece_2)
    with BuildSketch(Plane(origin=(0, 130, -2), x_dir=(0, 0, -1), z_dir=(0, -1, 0))) as redondeo3_piece_3_section:
        with BuildLine():
            CenterArc((REDONDEO3_R, REDONDEO3_R), REDONDEO3_R, 180, 90)
            Line((0, REDONDEO3_R), (0, 0))
            Line((0, 0), (REDONDEO3_R, 0))
        make_face()
    redondeo3_piece_3 = extrude(amount=130, mode=Mode.PRIVATE)
    redondeo3_piece_3 = split(redondeo3_piece_3, bisect_by=Plane(origin=(10.125839236, 64.3078842, -2.910792171), z_dir=(-0.9838699100999074, -0.17888543819998318, 0)), keep=Keep.TOP, mode=Mode.PRIVATE)
    redondeo3_piece_3 = split(redondeo3_piece_3, bisect_by=Plane(origin=(0.864029528, 2, -2.910792171), z_dir=(0, 1, 0)), keep=Keep.TOP, mode=Mode.PRIVATE)
    add(redondeo3_piece_3)
    with BuildSketch(Plane(origin=(-5, 0, 2), x_dir=(0, 0, 1), z_dir=(0, 1, 0))) as redondeo3_piece_4_section:
        with BuildLine():
            CenterArc((REDONDEO3_R, -REDONDEO3_R), REDONDEO3_R, 90, 90)
            Line((0, -REDONDEO3_R), (0, 0))
            Line((0, 0), (REDONDEO3_R, 0))
        make_face()
    redondeo3_piece_4 = extrude(amount=130, mode=Mode.PRIVATE)
    redondeo3_piece_4 = split(redondeo3_piece_4, bisect_by=Plane(origin=(-14.445438426, 68.050088659, 5.123027705), z_dir=(0.9838699100999074, -0.1788854381999832, 0)), keep=Keep.TOP, mode=Mode.PRIVATE)
    redondeo3_piece_4 = split(redondeo3_piece_4, bisect_by=Plane(origin=(-5.057051212, 13, 5.123027705), z_dir=(0, 1, 0)), keep=Keep.TOP, mode=Mode.PRIVATE)
    add(redondeo3_piece_4)
    with BuildSketch(Plane(origin=(-5, 0, 2), x_dir=(0, 0, 1), z_dir=(0, 1, 0))) as redondeo3_piece_5_section:
        with BuildLine():
            CenterArc((REDONDEO3_R, -REDONDEO3_R), REDONDEO3_R, 90, 90)
            Line((0, -REDONDEO3_R), (0, 0))
            Line((0, 0), (REDONDEO3_R, 0))
        make_face()
    redondeo3_piece_5 = extrude(amount=130, mode=Mode.PRIVATE)
    redondeo3_piece_5 = redondeo3_piece_5 - Plane(origin=(-5.656854249, 11.5, 5.656854249), x_dir=(1, 0, 0), z_dir=(0, -1, 0)) * Cylinder(3, 277, mode=Mode.PRIVATE)
    redondeo3_piece_5 = split(redondeo3_piece_5, bisect_by=Plane(origin=(-6.301520596, 13, 2.308845146), z_dir=(0, -1, 0)), keep=Keep.TOP, mode=Mode.PRIVATE)
    redondeo3_piece_5 = split(redondeo3_piece_5, bisect_by=Plane(origin=(-6.301520596, 2, 2.308845146), z_dir=(0, 1, 0)), keep=Keep.TOP, mode=Mode.PRIVATE)
    add(redondeo3_piece_5)
    with BuildSketch(Plane(origin=(0, 0, 2), x_dir=(0, 0, 1), z_dir=(0, 1, 0))) as redondeo3_piece_6_section:
        with BuildLine():
            CenterArc((REDONDEO3_R, REDONDEO3_R), REDONDEO3_R, 180, 90)
            Line((0, REDONDEO3_R), (0, 0))
            Line((0, 0), (REDONDEO3_R, 0))
        make_face()
    redondeo3_piece_6 = extrude(amount=130, mode=Mode.PRIVATE)
    redondeo3_piece_6 = split(redondeo3_piece_6, bisect_by=Plane(origin=(10.125839236, 64.3078842, 2.910792171), z_dir=(-0.9838699100999074, -0.17888543819998318, 0)), keep=Keep.TOP, mode=Mode.PRIVATE)
    redondeo3_piece_6 = split(redondeo3_piece_6, bisect_by=Plane(origin=(0.864029528, 2, 2.910792171), z_dir=(0, 1, 0)), keep=Keep.TOP, mode=Mode.PRIVATE)
    add(redondeo3_piece_6)


solid = part.part
